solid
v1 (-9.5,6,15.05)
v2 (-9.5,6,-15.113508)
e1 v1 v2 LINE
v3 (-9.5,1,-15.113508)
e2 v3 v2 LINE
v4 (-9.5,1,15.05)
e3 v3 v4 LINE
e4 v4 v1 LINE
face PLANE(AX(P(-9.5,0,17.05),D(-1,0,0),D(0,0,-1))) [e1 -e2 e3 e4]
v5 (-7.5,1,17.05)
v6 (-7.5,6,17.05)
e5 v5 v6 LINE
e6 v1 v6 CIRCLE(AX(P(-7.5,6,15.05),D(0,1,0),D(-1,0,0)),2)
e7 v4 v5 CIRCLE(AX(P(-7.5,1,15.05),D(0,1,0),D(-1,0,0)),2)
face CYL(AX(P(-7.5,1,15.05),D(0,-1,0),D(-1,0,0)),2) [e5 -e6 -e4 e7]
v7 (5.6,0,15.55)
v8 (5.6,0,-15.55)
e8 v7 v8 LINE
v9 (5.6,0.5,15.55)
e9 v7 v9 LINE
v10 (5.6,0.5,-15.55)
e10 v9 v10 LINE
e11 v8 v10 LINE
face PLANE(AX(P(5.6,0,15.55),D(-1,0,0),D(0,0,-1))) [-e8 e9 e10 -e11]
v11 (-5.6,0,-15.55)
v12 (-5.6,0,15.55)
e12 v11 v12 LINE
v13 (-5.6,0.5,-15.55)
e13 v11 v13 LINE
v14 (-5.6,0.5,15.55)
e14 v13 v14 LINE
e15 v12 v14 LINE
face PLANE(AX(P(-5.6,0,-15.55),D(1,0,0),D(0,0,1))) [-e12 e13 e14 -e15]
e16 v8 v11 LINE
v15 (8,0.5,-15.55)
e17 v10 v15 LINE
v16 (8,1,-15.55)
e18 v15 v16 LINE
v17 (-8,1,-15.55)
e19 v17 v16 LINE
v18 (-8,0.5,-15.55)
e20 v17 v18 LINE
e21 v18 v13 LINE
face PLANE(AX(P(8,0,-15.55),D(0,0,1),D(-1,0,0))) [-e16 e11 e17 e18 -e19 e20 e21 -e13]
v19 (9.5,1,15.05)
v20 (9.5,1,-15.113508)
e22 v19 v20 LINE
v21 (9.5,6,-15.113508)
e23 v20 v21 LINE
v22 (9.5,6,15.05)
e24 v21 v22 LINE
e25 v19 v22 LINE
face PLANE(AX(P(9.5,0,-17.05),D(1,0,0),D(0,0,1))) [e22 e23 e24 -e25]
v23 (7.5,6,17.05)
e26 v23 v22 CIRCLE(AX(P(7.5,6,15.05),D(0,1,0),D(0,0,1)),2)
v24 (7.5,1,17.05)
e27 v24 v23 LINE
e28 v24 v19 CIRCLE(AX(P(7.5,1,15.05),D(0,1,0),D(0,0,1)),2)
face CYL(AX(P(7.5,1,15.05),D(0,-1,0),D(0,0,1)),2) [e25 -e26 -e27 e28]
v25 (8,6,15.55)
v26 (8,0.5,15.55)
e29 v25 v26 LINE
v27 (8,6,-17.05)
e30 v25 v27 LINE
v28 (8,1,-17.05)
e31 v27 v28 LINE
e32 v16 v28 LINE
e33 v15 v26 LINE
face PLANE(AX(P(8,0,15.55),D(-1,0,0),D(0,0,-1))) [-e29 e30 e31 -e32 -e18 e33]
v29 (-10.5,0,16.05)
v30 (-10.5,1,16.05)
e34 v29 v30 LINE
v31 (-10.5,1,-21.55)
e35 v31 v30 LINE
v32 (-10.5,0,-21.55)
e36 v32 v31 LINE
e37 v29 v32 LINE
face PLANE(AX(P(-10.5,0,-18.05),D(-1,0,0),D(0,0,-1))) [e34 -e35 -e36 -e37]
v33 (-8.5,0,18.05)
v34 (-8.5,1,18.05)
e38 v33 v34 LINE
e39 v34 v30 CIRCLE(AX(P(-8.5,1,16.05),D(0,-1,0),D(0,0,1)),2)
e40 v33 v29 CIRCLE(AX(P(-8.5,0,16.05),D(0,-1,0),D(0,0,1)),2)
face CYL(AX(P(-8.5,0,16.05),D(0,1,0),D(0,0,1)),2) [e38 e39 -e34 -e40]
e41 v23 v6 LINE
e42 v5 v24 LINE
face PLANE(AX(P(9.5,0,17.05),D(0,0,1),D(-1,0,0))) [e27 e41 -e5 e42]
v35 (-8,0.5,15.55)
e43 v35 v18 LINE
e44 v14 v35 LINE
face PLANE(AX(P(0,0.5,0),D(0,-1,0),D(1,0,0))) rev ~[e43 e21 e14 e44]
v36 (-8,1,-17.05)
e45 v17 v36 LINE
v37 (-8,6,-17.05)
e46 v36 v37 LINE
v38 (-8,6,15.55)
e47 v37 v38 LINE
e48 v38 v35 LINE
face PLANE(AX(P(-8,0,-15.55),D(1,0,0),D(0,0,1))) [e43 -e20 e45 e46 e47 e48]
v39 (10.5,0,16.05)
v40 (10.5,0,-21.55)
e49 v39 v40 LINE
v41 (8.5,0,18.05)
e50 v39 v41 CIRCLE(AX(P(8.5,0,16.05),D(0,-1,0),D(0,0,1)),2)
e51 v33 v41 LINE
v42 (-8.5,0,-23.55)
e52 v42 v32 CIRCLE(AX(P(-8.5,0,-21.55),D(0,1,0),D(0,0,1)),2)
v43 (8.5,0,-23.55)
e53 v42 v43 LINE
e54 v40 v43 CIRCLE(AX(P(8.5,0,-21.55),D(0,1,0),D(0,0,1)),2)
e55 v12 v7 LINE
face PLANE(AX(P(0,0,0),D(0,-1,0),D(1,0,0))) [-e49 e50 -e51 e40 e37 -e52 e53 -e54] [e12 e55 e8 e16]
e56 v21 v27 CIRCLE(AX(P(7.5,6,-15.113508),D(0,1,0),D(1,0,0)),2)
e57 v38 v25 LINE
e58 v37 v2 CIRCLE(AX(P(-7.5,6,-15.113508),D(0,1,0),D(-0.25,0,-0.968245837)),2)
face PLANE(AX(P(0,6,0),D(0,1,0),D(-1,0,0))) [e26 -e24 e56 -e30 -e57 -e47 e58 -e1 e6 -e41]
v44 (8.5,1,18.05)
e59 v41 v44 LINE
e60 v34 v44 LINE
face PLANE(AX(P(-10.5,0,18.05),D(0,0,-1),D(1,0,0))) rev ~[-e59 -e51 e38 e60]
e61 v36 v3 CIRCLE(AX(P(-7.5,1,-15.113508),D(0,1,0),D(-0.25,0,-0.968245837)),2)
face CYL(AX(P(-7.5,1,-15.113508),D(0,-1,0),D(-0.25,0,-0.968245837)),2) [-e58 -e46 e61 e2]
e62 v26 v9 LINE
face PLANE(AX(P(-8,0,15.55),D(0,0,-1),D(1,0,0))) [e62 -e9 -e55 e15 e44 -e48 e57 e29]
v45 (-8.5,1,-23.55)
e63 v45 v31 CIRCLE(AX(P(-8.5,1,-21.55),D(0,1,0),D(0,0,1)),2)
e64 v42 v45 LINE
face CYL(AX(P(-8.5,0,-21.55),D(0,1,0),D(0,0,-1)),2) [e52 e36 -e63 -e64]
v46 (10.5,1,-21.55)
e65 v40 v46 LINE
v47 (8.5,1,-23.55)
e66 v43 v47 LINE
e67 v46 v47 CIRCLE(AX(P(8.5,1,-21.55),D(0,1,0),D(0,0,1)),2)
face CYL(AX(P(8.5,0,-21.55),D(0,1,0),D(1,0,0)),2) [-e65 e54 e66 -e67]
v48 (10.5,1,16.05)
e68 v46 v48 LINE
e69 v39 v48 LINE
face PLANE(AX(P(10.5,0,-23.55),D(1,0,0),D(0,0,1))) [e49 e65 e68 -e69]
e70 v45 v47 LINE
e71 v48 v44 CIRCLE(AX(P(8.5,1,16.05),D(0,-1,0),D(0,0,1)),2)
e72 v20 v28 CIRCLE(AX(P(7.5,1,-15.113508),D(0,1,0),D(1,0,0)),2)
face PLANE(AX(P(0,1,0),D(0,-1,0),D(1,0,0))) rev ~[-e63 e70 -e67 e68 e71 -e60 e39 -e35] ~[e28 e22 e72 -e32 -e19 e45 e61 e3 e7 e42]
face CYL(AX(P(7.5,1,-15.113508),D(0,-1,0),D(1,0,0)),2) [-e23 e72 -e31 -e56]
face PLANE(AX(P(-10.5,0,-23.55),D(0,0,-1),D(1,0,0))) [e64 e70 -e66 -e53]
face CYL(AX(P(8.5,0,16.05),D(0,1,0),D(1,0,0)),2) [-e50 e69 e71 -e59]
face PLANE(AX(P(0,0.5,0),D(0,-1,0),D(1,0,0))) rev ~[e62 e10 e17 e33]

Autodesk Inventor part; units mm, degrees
ref_plane "YZ Plane" through (0, 0, 0) normal (1, 0, 0) x (0, 1, 0)
ref_plane "XZ Plane" through (0, 0, 0) normal (0, 1, 0) x (-1, 0, 0)
ref_plane "XY Plane" through (0, 0, 0) normal (0, 0, 1) x (1, 0, 0)
sketch "Boceto1" plane through (0, 0, 0) normal (0, 1, 0) x (-1, 0, 0)
  line L0 (-8, -15.55) -> (8, -15.55)
  line L1 (8, -15.55) -> (8, 15.55)
  line L2 (8, 15.55) -> (-8, 15.55)
  line L3 (-8, 15.55) -> (-8, -15.55)
  line L4 (-8, -15.55) -> (8, 15.55) construction
  line L5 (8, -15.55) -> (-8, 15.55) construction
  line L6 (9.5, 17.05) -> (9.5, -17.05)
  line L7 (9.5, -17.05) -> (-9.5, -17.05)
  line L8 (-9.5, -17.05) -> (-9.5, 17.05)
  line L9 (-9.5, 17.05) -> (9.5, 17.05)
  point P0 (0, 0)
  dimension "d0" = 16
  dimension "d1" = 31.1
  dimension "d2" = 1.5
extrude "Extrusión1" add sketch "Boceto1" along normal blind 6
sketch "Boceto2" plane through (0, 0, 0) normal (0, -1, 0) x (1, 0, 0)
  line L0 (9.5, 17.05) -> (9.5, -17.05) projected
  line L1 (-9.5, 17.05) -> (9.5, 17.05) projected
  line L2 (-9.5, -17.05) -> (-9.5, 17.05) projected
  line L3 (9.5, -17.05) -> (-9.5, -17.05) projected
  line L4 (8, -15.55) -> (8, 15.55) projected
  line L5 (-8, -15.55) -> (8, -15.55) projected
  line L6 (-8, 15.55) -> (-8, -15.55) projected
  line L7 (8, 15.55) -> (-8, 15.55) projected
  line L8 (10.5, 18.05) -> (10.5, -18.05)
  line L9 (10.5, -18.05) -> (-10.5, -18.05)
  line L10 (-10.5, -18.05) -> (-10.5, 18.05)
  line L11 (-10.5, 18.05) -> (10.5, 18.05)
  line L12 (10.5, -18.05) -> (-10.5, -18.05)
  line L13 (-10.5, -18.05) -> (-10.5, -24.55)
  line L14 (-10.5, -24.55) -> (10.5, -24.55)
  line L15 (10.5, -24.55) -> (10.5, -18.05)
  point P0 (0, 0)
  dimension "d5" = 2.5
  dimension "d19" = 6.5
extrude "Extrusión2" add sketch "Boceto2" against normal blind 1 contours L0 L3 L2 L1 | L8 L9 L10 L11
sketch "Boceto8" plane through (0, 0, 0) normal (0, -1, 0) x (1, 0, 0)
  line L0 (10.5, 18.05) -> (10.5, -18.05) projected
  line L1 (10.5, -18.05) -> (-10.5, -18.05)
  line L2 (-10.5, -18.05) -> (-10.5, -23.55)
  line L3 (-10.5, -23.55) -> (10.5, -23.55)
  line L4 (10.5, -23.55) -> (10.5, -18.05)
  point P0 (0, 0)
  dimension "d20" = 21
  dimension "d21" = 5.5
extrude "Extrusión7" add sketch "Boceto8" against normal blind 1
sketch "Boceto9" plane through (0, 6, 0) normal (0, 1, 0) x (1, 0, 0)
  line L0 (9.5, -17.05) -> (9.5, 17.05) projected
  line L1 (9.5, 17.05) -> (-9.5, 17.05) projected
  line L2 (-9.5, 17.05) -> (-9.5, -17.05) projected
  line L3 (-9.5, -17.05) -> (9.5, -17.05) projected
  line L4 (8, 15.55) -> (8, -15.55) projected
  line L5 (8, -15.55) -> (-8, -15.55) projected
  line L6 (-8, -15.55) -> (-8, 15.55) projected
  line L7 (-8, 15.55) -> (8, 15.55) projected
  line L8 (-10.5, -18.05) -> (10.5, -18.05) projected
  line L9 (10.5, -18.05) -> (10.5, 23.55) projected
  line L10 (-9.5, -17.05) -> (9.5, -17.05) projected
  line L11 (-9.5, 17.05) -> (-9.5, -17.05) projected
  line L12 (9.5, 17.05) -> (-9.5, 17.05) projected
  line L13 (9.5, -17.05) -> (9.5, 17.05) projected
  line L14 (-8, 15.55) -> (8, 15.55)
  line L15 (8, 15.55) -> (8, 21.35)
  line L16 (8, 21.35) -> (-8, 21.35)
  line L17 (-8, 21.35) -> (-8, 15.55)
  line L18 (-10.5, 23.55) -> (-10.5, -18.05) projected
  line L19 (10.5, 23.55) -> (-10.5, 23.55) projected
  point P0 (0, 0)
  point P1 (8, 15.55)
  dimension "d24" = 5.8
extrude "Extrusión8" cut sketch "Boceto9" against normal blind 5 contours L15 L7 L17 L1 | L1 L17 L16 L15
fillet "Empalme3" radius 2 4 edges at (-10.5, 0.5, 18.05) (10.5, 0.5, 18.05) (-10.5, 0.5, -23.55) (10.5, 0.5, -23.55)
fillet "Empalme4" radius 2 4 edges at (-9.5, 3.5, -17.05) (-9.5, 3.5, 17.05) (9.5, 3.5, 17.05) (9.5, 3.5, -17.05)
sketch "Boceto10" plane through (0, 0, 0) normal (0, -1, 0) x (1, 0, 0)
  line L0 (8, -15.55) -> (8, 15.55) projected
  line L1 (-8, -15.55) -> (8, -15.55) projected
  line L2 (8, 15.55) -> (5.6, 15.55)
  line L3 (5.6, 15.55) -> (5.6, -15.55)
  line L4 (5.6, -15.55) -> (8, -15.55)
  line L5 (8, -15.55) -> (8, 15.55)
  line L6 (-8, -15.55) -> (-5.6, -15.55)
  line L7 (-5.6, -15.55) -> (-5.6, 15.55)
  line L8 (-5.6, 15.55) -> (-8, 15.55)
  line L9 (-8, 15.55) -> (-8, -15.55)
  point P0 (0, 0)
  dimension "d29" = 2.4
  dimension "d30" = 2.4
  dimension "d31" = 31.1
extrude "Extrusión9" add sketch "Boceto10" against normal blind 0.5
properties part number "Pieza USB Tester"
